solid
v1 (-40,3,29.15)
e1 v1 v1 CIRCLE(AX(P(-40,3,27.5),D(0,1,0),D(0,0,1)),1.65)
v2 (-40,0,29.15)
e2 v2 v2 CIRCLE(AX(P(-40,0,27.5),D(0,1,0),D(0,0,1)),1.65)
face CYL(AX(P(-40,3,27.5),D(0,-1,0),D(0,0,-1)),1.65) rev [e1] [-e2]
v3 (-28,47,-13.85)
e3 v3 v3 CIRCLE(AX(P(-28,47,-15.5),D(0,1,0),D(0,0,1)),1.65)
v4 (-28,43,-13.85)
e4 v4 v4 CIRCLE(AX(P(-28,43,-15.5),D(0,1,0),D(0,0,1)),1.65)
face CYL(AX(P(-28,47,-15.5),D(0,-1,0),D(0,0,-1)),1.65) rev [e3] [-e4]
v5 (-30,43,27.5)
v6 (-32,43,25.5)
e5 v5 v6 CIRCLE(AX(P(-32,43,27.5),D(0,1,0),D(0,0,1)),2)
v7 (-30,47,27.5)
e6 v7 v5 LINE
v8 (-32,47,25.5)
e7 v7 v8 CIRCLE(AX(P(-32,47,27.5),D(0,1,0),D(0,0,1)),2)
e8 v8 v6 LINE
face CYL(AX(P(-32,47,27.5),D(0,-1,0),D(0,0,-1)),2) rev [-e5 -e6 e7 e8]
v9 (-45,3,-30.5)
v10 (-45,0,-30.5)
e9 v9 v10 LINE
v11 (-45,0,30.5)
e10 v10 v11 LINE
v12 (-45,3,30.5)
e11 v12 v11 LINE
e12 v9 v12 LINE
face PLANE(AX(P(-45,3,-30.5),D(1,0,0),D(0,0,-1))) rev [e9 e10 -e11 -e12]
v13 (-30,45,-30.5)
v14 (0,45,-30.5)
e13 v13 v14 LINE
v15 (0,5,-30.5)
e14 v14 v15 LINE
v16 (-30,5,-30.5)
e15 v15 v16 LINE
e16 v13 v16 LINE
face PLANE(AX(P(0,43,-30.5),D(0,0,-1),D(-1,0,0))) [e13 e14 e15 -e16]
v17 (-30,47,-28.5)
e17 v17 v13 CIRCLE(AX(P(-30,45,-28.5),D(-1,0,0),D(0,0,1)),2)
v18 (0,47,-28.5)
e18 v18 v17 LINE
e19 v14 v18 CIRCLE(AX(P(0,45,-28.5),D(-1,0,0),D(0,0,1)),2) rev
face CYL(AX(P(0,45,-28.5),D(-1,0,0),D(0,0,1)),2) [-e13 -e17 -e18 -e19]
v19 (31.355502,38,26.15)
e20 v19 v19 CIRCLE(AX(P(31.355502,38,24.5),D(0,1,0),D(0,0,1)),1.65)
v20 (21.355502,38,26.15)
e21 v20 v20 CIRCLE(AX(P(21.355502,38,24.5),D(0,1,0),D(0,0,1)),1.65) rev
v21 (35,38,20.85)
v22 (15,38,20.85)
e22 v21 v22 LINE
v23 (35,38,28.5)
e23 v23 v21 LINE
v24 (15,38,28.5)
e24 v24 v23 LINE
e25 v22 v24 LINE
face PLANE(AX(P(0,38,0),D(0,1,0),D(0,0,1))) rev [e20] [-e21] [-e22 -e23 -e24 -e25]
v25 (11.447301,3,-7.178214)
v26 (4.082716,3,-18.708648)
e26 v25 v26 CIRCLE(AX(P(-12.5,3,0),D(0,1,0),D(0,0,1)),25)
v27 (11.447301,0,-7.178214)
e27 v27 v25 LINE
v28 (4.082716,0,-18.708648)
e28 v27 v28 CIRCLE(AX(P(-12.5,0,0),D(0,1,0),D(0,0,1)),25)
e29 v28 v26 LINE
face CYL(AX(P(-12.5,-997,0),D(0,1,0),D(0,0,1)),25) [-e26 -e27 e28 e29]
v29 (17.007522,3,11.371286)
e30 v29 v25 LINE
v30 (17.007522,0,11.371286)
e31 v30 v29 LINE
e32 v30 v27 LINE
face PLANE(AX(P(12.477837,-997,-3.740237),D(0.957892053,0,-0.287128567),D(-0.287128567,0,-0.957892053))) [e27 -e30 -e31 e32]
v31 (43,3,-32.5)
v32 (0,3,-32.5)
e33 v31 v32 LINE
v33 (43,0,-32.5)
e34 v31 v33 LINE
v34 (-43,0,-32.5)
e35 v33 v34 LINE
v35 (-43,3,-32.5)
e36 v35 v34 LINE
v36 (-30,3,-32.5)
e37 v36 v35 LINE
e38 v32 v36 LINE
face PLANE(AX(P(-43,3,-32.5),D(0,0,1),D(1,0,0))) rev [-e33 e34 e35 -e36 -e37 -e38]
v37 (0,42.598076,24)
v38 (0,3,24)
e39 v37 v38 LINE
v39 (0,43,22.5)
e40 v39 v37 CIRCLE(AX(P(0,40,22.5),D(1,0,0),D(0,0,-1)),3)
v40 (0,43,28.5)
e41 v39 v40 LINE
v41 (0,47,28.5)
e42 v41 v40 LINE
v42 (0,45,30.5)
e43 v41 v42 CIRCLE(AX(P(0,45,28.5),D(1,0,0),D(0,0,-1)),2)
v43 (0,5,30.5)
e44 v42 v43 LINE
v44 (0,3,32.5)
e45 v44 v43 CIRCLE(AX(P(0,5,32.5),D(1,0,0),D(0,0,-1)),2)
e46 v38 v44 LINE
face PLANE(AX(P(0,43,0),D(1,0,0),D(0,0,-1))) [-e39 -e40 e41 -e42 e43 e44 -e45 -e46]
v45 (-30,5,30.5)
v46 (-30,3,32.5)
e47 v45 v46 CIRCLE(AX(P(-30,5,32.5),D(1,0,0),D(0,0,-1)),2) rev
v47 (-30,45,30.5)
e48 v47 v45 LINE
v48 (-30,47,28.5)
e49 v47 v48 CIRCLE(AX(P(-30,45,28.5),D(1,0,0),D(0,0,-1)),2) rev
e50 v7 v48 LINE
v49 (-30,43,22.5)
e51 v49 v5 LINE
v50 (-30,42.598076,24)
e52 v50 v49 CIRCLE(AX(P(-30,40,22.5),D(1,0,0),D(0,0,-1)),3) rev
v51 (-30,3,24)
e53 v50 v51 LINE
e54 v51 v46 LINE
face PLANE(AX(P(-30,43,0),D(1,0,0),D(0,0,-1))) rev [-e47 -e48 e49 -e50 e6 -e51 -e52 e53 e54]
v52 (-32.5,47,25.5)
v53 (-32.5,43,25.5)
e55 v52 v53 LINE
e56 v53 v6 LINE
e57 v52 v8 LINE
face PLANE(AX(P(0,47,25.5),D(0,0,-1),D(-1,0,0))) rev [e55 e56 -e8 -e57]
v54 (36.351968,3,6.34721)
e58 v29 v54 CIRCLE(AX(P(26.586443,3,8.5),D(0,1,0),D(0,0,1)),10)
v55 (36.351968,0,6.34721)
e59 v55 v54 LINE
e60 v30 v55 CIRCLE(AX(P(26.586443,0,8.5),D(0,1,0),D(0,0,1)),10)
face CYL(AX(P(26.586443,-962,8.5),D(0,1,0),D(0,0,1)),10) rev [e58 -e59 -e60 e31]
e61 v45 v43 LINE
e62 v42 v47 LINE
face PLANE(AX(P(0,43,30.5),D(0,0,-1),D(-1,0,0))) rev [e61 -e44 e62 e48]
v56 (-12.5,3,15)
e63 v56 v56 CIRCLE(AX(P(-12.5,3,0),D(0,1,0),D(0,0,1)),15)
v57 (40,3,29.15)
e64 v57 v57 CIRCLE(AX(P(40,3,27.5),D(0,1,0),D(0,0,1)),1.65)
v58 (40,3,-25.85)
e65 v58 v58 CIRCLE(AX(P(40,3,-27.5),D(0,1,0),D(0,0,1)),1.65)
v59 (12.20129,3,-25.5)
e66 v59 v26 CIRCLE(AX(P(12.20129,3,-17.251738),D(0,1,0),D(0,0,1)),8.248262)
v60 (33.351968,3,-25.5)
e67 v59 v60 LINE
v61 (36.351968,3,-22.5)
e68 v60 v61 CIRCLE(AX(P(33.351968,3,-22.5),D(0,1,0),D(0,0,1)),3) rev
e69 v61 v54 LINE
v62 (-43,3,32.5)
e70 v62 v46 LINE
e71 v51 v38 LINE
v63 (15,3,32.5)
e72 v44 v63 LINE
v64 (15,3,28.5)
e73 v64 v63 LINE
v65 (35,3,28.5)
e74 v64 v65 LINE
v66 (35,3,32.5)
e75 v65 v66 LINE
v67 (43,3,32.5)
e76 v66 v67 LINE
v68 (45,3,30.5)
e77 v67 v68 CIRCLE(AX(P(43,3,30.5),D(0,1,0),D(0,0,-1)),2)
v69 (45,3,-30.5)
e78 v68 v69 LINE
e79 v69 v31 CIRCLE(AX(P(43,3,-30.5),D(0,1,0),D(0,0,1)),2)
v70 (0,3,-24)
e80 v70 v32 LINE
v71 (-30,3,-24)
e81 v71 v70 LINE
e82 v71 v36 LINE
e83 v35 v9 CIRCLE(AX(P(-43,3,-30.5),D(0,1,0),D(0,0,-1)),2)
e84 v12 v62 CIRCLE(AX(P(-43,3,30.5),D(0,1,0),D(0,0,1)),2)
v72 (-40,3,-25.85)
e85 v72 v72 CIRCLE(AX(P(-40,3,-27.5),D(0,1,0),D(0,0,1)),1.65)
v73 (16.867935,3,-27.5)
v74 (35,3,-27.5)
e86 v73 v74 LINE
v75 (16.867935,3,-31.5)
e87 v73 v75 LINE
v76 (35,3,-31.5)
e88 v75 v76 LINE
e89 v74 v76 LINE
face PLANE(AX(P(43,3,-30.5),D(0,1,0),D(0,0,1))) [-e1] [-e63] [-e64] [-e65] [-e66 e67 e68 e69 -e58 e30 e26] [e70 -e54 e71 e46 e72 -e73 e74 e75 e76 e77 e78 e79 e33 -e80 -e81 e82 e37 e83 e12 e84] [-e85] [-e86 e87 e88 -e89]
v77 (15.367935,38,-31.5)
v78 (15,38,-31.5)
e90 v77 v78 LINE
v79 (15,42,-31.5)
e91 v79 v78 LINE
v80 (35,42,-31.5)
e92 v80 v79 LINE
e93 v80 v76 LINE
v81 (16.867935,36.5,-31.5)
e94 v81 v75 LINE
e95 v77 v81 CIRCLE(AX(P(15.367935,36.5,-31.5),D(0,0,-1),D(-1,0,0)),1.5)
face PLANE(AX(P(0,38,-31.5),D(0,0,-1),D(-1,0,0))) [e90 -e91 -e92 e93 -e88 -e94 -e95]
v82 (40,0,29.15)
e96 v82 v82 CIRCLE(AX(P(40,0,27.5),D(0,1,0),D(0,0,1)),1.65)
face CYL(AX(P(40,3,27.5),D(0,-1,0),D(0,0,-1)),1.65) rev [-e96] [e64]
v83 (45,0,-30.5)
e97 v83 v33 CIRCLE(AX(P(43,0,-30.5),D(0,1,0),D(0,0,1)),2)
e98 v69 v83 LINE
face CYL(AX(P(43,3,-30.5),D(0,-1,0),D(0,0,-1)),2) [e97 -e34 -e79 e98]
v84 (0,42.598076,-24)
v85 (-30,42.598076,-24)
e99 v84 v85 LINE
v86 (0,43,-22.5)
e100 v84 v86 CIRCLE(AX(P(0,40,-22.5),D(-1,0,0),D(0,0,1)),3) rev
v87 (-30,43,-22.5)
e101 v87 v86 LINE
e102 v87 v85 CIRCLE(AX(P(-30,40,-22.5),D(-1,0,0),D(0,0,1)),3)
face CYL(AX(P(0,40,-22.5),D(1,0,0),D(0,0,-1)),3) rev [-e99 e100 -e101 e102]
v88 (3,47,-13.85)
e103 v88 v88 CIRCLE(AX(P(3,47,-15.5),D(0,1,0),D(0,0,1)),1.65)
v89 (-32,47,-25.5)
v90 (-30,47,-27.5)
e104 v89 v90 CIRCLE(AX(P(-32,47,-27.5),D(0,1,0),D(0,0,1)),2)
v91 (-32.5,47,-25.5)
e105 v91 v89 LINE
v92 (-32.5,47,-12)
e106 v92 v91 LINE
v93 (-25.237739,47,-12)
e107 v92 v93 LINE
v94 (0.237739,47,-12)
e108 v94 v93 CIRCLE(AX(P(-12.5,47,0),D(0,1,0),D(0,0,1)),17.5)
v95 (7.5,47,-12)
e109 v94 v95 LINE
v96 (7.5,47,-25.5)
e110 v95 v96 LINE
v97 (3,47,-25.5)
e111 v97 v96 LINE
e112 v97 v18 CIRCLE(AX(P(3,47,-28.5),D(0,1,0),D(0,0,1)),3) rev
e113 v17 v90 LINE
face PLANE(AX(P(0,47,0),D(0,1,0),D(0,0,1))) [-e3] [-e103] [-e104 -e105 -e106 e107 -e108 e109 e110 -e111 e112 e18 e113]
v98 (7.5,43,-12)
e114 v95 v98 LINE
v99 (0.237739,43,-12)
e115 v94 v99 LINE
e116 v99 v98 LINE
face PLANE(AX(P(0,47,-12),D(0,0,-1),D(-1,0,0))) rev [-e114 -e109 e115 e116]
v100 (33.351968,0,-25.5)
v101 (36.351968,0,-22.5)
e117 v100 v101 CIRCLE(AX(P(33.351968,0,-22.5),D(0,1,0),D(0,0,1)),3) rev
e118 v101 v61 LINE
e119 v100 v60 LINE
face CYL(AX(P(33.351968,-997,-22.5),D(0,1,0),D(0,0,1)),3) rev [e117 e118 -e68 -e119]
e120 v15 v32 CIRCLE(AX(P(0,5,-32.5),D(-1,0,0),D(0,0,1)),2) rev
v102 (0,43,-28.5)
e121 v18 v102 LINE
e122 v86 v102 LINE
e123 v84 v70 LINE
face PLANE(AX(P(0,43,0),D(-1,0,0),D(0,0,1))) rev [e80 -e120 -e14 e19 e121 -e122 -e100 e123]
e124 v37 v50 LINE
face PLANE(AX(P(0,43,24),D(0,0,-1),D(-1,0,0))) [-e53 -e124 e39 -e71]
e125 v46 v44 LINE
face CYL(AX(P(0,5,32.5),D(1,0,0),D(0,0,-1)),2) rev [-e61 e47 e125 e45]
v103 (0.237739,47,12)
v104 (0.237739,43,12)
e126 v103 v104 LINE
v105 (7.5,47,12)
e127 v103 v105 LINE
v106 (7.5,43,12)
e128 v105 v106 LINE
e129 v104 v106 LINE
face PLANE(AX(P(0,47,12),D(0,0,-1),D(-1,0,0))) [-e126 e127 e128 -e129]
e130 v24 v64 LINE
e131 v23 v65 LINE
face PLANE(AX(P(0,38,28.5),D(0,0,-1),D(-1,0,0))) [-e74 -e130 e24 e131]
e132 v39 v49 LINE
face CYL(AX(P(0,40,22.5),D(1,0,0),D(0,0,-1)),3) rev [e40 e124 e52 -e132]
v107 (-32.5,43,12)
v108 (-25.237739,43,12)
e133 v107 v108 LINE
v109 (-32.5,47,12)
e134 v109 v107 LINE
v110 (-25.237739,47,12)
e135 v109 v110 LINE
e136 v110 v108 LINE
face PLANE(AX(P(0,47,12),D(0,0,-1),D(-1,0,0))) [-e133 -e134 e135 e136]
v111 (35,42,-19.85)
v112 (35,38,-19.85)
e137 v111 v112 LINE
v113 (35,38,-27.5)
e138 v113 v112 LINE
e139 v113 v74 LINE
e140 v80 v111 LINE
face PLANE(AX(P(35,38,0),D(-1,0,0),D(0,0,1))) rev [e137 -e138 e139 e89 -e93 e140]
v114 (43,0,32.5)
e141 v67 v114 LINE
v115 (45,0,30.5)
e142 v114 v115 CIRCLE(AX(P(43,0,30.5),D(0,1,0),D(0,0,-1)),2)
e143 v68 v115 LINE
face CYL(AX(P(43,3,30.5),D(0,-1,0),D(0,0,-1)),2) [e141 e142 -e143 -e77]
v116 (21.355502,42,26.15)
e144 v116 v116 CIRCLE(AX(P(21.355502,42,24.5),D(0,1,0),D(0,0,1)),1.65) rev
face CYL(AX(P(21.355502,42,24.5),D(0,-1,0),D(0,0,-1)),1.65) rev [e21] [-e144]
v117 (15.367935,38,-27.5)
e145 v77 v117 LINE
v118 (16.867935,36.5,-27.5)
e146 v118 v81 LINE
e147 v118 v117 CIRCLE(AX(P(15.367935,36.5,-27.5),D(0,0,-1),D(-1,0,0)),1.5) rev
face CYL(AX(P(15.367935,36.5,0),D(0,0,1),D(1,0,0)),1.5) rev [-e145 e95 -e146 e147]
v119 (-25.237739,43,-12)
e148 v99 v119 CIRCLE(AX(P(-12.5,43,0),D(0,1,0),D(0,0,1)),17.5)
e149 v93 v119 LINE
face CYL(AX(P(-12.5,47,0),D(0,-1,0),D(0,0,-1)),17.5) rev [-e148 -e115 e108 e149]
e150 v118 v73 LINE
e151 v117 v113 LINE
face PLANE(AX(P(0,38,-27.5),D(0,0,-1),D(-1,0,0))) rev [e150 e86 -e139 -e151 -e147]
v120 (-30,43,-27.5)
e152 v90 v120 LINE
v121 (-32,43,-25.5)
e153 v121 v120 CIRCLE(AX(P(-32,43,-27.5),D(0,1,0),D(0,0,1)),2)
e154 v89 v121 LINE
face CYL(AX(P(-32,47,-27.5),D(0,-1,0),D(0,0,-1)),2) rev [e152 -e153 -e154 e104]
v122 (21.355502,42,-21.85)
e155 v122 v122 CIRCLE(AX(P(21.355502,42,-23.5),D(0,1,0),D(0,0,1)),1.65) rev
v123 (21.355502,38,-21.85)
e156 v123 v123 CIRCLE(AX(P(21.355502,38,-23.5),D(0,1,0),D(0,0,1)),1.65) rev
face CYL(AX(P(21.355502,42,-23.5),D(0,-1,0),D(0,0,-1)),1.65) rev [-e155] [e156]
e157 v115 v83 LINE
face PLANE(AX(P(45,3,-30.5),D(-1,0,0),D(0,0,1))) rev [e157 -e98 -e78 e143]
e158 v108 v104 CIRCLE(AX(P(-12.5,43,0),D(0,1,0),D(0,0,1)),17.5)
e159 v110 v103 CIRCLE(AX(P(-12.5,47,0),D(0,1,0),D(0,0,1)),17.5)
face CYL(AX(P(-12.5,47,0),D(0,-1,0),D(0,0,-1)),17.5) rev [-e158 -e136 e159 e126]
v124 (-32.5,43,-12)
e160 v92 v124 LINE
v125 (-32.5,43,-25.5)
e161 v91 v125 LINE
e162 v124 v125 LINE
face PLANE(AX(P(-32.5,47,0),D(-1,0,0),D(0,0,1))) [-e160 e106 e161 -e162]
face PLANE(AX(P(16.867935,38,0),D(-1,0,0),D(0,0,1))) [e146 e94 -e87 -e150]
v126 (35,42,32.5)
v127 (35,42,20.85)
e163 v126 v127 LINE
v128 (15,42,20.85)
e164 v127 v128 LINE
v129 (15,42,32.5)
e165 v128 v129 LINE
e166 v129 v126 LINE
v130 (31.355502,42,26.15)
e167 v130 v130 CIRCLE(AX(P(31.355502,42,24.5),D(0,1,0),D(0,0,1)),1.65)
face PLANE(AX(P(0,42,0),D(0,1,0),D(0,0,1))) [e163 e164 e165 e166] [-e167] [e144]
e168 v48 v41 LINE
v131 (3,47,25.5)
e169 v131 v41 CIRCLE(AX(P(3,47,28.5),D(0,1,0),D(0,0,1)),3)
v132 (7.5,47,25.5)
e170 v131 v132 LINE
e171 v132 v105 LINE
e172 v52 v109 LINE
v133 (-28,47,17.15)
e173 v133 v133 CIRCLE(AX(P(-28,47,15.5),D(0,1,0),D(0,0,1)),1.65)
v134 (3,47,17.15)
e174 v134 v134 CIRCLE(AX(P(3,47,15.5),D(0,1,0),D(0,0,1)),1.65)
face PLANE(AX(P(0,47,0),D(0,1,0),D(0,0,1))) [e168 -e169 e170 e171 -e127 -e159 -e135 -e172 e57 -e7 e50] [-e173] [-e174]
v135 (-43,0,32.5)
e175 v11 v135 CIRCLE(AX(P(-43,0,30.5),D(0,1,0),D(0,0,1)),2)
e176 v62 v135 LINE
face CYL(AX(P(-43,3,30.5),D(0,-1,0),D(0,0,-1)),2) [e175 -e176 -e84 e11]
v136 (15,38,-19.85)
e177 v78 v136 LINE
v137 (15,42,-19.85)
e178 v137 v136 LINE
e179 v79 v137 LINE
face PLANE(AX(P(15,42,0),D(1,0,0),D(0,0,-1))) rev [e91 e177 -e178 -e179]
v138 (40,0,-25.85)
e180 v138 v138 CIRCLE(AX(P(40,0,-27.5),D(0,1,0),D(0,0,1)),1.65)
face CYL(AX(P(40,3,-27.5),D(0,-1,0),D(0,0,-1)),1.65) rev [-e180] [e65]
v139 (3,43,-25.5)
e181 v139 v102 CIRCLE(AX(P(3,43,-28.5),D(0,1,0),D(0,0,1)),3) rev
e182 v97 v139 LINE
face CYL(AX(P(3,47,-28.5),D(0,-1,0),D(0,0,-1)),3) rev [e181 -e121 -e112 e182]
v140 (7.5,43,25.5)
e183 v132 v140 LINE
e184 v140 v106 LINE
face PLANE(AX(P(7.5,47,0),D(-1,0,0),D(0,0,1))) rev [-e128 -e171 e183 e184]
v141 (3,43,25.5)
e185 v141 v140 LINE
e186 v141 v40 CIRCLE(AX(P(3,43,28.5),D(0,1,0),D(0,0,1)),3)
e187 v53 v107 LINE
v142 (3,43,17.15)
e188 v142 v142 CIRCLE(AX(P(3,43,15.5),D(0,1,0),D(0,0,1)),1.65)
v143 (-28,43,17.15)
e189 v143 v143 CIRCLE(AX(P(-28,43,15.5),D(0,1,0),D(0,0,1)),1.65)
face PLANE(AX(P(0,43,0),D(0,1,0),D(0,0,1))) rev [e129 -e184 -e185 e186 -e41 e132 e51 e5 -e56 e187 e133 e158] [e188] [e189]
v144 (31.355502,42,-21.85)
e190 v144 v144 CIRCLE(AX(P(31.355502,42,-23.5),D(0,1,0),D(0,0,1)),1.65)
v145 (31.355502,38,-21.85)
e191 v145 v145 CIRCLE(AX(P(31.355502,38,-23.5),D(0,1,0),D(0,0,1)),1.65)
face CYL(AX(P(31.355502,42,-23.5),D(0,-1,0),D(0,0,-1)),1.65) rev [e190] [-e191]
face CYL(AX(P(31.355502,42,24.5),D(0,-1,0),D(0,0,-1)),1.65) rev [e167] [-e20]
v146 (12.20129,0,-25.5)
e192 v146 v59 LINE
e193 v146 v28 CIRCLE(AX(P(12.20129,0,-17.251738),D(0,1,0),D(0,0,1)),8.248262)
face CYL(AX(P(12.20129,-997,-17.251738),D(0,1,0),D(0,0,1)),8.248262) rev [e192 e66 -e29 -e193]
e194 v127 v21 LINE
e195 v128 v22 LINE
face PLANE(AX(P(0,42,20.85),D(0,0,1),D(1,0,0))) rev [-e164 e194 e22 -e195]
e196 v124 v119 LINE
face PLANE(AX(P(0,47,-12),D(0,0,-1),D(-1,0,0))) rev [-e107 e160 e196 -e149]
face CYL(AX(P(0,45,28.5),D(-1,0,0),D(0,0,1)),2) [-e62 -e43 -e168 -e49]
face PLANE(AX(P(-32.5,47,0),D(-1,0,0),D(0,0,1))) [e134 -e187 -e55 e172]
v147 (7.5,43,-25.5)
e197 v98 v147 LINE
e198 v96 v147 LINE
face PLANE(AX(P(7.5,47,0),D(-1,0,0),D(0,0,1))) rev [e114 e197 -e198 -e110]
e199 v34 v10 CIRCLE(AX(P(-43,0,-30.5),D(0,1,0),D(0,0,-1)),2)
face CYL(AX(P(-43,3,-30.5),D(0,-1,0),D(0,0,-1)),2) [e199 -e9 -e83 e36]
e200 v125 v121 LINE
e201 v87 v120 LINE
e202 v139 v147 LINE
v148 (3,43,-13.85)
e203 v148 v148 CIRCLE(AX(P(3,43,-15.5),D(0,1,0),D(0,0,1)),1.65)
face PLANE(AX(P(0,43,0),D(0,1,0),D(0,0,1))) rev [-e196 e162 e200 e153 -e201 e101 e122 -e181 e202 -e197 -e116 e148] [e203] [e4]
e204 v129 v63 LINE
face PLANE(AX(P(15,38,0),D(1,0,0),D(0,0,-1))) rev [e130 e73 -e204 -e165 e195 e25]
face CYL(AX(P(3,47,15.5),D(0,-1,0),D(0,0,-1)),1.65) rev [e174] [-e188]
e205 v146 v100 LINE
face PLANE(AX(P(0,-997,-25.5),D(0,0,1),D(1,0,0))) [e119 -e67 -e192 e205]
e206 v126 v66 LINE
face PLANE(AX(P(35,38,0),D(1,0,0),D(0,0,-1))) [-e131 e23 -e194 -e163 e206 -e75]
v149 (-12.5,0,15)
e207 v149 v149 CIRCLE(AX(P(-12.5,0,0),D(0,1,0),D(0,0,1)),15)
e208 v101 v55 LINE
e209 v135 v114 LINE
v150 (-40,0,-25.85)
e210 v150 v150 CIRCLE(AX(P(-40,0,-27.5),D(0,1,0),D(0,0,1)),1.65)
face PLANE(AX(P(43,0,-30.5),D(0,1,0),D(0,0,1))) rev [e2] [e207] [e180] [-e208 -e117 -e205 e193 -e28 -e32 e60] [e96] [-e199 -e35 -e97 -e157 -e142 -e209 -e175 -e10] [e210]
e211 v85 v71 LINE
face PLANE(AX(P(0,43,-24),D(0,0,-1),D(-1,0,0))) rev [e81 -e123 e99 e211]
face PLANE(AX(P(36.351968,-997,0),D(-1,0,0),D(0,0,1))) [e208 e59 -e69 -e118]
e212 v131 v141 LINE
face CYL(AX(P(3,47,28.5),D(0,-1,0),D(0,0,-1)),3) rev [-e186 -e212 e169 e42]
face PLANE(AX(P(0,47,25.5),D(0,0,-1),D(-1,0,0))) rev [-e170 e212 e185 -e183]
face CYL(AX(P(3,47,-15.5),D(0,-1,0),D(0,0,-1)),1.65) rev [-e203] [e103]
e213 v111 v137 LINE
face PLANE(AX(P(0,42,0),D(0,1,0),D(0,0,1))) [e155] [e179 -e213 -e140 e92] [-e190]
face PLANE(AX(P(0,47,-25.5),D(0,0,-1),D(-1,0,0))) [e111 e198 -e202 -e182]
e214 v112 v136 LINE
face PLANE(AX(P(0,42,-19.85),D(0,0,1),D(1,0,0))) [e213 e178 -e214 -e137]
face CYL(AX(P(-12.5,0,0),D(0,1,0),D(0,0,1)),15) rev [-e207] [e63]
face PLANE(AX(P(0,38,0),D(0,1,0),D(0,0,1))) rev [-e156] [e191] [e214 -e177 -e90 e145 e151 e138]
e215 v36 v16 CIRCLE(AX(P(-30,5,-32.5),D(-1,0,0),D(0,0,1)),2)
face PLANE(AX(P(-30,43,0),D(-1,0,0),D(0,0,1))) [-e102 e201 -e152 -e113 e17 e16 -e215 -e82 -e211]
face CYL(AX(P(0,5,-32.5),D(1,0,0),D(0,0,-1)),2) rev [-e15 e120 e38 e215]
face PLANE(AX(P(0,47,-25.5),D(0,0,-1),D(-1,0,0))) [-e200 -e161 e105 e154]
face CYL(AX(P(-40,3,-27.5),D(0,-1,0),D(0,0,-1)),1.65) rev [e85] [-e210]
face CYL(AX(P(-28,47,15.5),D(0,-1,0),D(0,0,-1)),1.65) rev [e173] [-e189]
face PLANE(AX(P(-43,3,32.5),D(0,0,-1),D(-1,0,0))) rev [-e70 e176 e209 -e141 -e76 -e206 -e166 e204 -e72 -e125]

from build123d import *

# Parameters (mm, degrees)
SKETCH_1_R                = 1.65
EXTRUDE_2_DEPTH           = 3
SKETCH_2_W                = 30
SKETCH_2_H                = 5
EXTRUDE_3_DEPTH           = 40
FILLET_1_R                = 2
EXTRUDE_START             = -30
EXTRUDE_4_DEPTH           = 30
EXTRUDE_4_2_OUTLINE_R     = 1.65
EXTRUDE_4_2_DEPTH         = 4
CUT_EXTRUDE_START         = -30
CUT_EXTRUDE_1_DEPTH       = 30
CUT_EXTRUDE_START_2       = -32.5
CUT_EXTRUDE_1_2_DEPTH     = 40
CUT_EXTRUDE_START_3       = -3
CUT_EXTRUDE_1_3_OUTLINE_R = 15
CUT_EXTRUDE_1_3_DEPTH     = 3
SKETCH_7_W                = 18.132065191
SKETCH_7_H                = 4
SKETCH_7_R                = 10
SKETCH_7_W_2              = 20
EXTRUDE_6_DEPTH           = 35
SKETCH_9_W                = 20
SKETCH_9_H                = 11.65
SKETCH_9_R                = 1.65
EXTRUDE_7_DEPTH           = 4
CUT_EXTRUDE_START_4       = -31.5
CUT_EXTRUDE_2_DEPTH       = 4
CUT_EXTRUDE_START_5       = -39
CUT_EXTRUDE_2_2_OUTLINE_R = 10
CUT_EXTRUDE_2_2_DEPTH     = 40
CUT_EXTRUDE_START_6       = -1000
CUT_EXTRUDE_3_DEPTH       = 1000
SKETCH_13_W               = 30
SKETCH_13_H               = 1.5
EXTRUDE_8_DEPTH           = 40


with BuildPart() as part:
    # 草图1 → 凸台-拉伸2 (new body)
    with BuildSketch(Plane(origin=(0, 0, 0), x_dir=(1, 0, 0), z_dir=(0, 1, 0))):
        with BuildLine():
            Line((-43, 32.5), (43, 32.5))
            ThreePointArc((43, 32.5), (44.414213562, 31.914213562), (45, 30.5))
            Line((45, 30.5), (45, -30.5))
            ThreePointArc((45, -30.5), (44.414213562, -31.914213562), (43, -32.5))
            Line((43, -32.5), (-43, -32.5))
            ThreePointArc((-43, -32.5), (-44.414213562, -31.914213562), (-45, -30.5))
            Line((-45, -30.5), (-45, 30.5))
            ThreePointArc((-45, 30.5), (-44.414213562, 31.914213562), (-43, 32.5))
        make_face()
        with Locations(Location((-40, 27.5, 0), (0, 0, 270))):
            Circle(SKETCH_1_R, mode=Mode.SUBTRACT)
        with Locations(Location((40, 27.5, 0), (0, 0, 270))):
            Circle(SKETCH_1_R, mode=Mode.SUBTRACT)
        with Locations(Location((-40, -27.5, 0), (0, 0, 270))):
            Circle(SKETCH_1_R, mode=Mode.SUBTRACT)
        with Locations(Location((40, -27.5, 0), (0, 0, 270))):
            Circle(SKETCH_1_R, mode=Mode.SUBTRACT)
    extrude(amount=EXTRUDE_2_DEPTH)

    # 草图2 → 凸台-拉伸3 (add)
    with BuildSketch(Plane(origin=(0, 3, 0), x_dir=(1, 0, 0), z_dir=(0, 1, 0))):
        with Locations((-15, 28)):
            Rectangle(SKETCH_2_W, SKETCH_2_H)
        with Locations((-15, -28)):
            Rectangle(SKETCH_2_W, SKETCH_2_H)
    extrude(amount=EXTRUDE_3_DEPTH)

    # 圆角1
    fillet_1_edges = [part.edges().sort_by_distance(p)[0] for p in [
        (-15, 3, -30.5),
    ]]
    fillet(fillet_1_edges, radius=FILLET_1_R - 0.0001)  # a hair under: the kernel refuses the full size

    # 凸台-拉伸4: read off the stored shape, not the designer's step
    # 凸台-拉伸4 outline → 凸台-拉伸4 (add)
    with BuildSketch(Plane.YZ.offset(EXTRUDE_START)):
        with BuildLine():
            ThreePointArc((5, 30.5), (3.585786438, 31.085786438), (3, 32.5))
            Line((3, 32.5), (3, 30.5))
            Line((3, 30.5), (5, 30.5))
        make_face()
    extrude(amount=EXTRUDE_4_DEPTH)

    # Extrude 4 2 outline → Extrude 4 2 (add)
    # profile 1 of 2: a face of its own
    with BuildSketch(Plane(origin=(0, 43, 0), x_dir=(1, 0, 0), z_dir=(0, 1, 0))):
        with BuildLine():
            Line((7.5, 12), (7.5, 25.5))
            Line((7.5, 25.5), (3, 25.5))
            ThreePointArc((3, 25.5), (0.878679656, 26.378679656), (0, 28.5))
            Line((0, 28.5), (0, 30.5))
            Line((0, 30.5), (-30, 30.5))
            Line((-30, 30.5), (-30, 27.5))
            ThreePointArc((-30, 27.5), (-30.585786438, 26.085786438), (-32, 25.5))
            Line((-32, 25.5), (-32.5, 25.5))
            Line((-32.5, 25.5), (-32.5, 12))
            Line((-32.5, 12), (-25.237739203, 12))
            ThreePointArc((-25.237739203, 12), (-12.5, 17.5), (0.237739203, 12))
            Line((0.237739203, 12), (7.5, 12))
        make_face()
        with Locations((-28, 15.5)):
            Circle(EXTRUDE_4_2_OUTLINE_R, mode=Mode.SUBTRACT)
        with Locations((3, 15.5)):
            Circle(EXTRUDE_4_2_OUTLINE_R, mode=Mode.SUBTRACT)
    # profile 2 of 2: a face of its own
    with BuildSketch(Plane(origin=(0, 43, 0), x_dir=(1, 0, 0), z_dir=(0, 1, 0))):
        with BuildLine():
            Line((-25.237739203, -12), (-32.5, -12))
            Line((-32.5, -12), (-32.5, -25.5))
            Line((-32.5, -25.5), (-32, -25.5))
            ThreePointArc((-32, -25.5), (-30.585786438, -26.085786438), (-30, -27.5))
            Line((-30, -27.5), (-30, -30.5))
            Line((-30, -30.5), (0, -30.5))
            Line((0, -30.5), (0, -28.5))
            ThreePointArc((0, -28.5), (0.878679656, -26.378679656), (3, -25.5))
            Line((3, -25.5), (7.5, -25.5))
            Line((7.5, -25.5), (7.5, -12))
            Line((7.5, -12), (0.237739203, -12))
            ThreePointArc((0.237739203, -12), (-12.5, -17.5), (-25.237739203, -12))
        make_face()
        with Locations((-28, -15.5)):
            Circle(EXTRUDE_4_2_OUTLINE_R, mode=Mode.SUBTRACT)
        with Locations((3, -15.5)):
            Circle(EXTRUDE_4_2_OUTLINE_R, mode=Mode.SUBTRACT)
    extrude(amount=EXTRUDE_4_2_DEPTH)

    # 切除-拉伸1: read off the stored shape, not the designer's step
    # 切除-拉伸1 outline → 切除-拉伸1 (add)
    with BuildSketch(Plane.YZ.offset(CUT_EXTRUDE_START)):
        with BuildLine():
            ThreePointArc((40, 25.5), (42.121320344, 24.621320344), (43, 22.5))
            Line((43, 22.5), (43, 25.5))
            Line((43, 25.5), (40, 25.5))
        make_face()
        with BuildLine():
            ThreePointArc((43, -22.5), (42.121320344, -24.621320344), (40, -25.5))
            Line((40, -25.5), (43, -25.5))
            Line((43, -25.5), (43, -22.5))
        make_face()
    extrude(amount=CUT_EXTRUDE_1_DEPTH)

    # Cut-Extrude 1 2 outline → Cut-Extrude 1 2 (cut)
    with BuildSketch(Plane.YZ.offset(CUT_EXTRUDE_START_2)):
        with BuildLine():
            Line((47, 30.5), (45, 30.5))
            ThreePointArc((45, 30.5), (46.414213562, 29.914213562), (47, 28.5))
            Line((47, 28.5), (47, 30.5))
        make_face()
        with BuildLine():
            Line((47, -30.5), (47, -28.5))
            ThreePointArc((47, -28.5), (46.414213562, -29.914213562), (45, -30.5))
            Line((45, -30.5), (47, -30.5))
        make_face()
    extrude(amount=CUT_EXTRUDE_1_2_DEPTH, mode=Mode.SUBTRACT)

    # Cut-Extrude 1 3 outline → Cut-Extrude 1 3 (cut)
    with BuildSketch(Plane(origin=(0, 3, 0), x_dir=(1, 0, 0), z_dir=(0, 1, 0)).offset(CUT_EXTRUDE_START_3)):
        with Locations((-12.5, 0)):
            Circle(CUT_EXTRUDE_1_3_OUTLINE_R)
    extrude(amount=CUT_EXTRUDE_1_3_DEPTH, mode=Mode.SUBTRACT)

    # 草图7 → 凸台-拉伸6 (add)
    with BuildSketch(Plane(origin=(0, 3, 0), x_dir=(1, 0, 0), z_dir=(0, 1, 0))):
        with Locations((25.933967405, 29.5)):
            Rectangle(SKETCH_7_W, SKETCH_7_H)
        with Locations(Location((26.586442662, -8.5, 0), (0, 0, 270))):
            Circle(SKETCH_7_R)
        with Locations((25, -30.5)):
            Rectangle(SKETCH_7_W_2, SKETCH_7_H)
    extrude(amount=EXTRUDE_6_DEPTH)

    # 草图9 → 凸台-拉伸7 (add)
    # profile 1 of 2: a face of its own
    with BuildSketch(Plane(origin=(0, 38, 0), x_dir=(1, 0, 0), z_dir=(0, 1, 0))):
        with Locations((25, 25.675)):
            Rectangle(SKETCH_9_W, SKETCH_9_H)
        with Locations(Location((31.355501541, 23.5, 0), (0, 0, 270))):
            Circle(SKETCH_9_R, mode=Mode.SUBTRACT)
        with Locations(Location((21.355501541, 23.5, 0), (0, 0, 270))):
            Circle(SKETCH_9_R, mode=Mode.SUBTRACT)
    # profile 2 of 2: a face of its own
    with BuildSketch(Plane(origin=(0, 38, 0), x_dir=(1, 0, 0), z_dir=(0, 1, 0))):
        with Locations((25, -26.675)):
            Rectangle(SKETCH_9_W, SKETCH_9_H)
        with Locations(Location((31.355501541, -24.5, 0), (0, 0, 270))):
            Circle(SKETCH_9_R, mode=Mode.SUBTRACT)
        with Locations(Location((21.355501541, -24.5, 0), (0, 0, 270))):
            Circle(SKETCH_9_R, mode=Mode.SUBTRACT)
    extrude(amount=EXTRUDE_7_DEPTH)

    # 切除-拉伸2: read off the stored shape, not the designer's step
    # 切除-拉伸2 outline → 切除-拉伸2 (add)
    with BuildSketch(Plane.XY.offset(CUT_EXTRUDE_START_4)):
        with BuildLine():
            ThreePointArc((15.367934809, 38), (16.42859498, 37.560660171), (16.867934809, 36.5))
            Line((16.867934809, 36.5), (16.867934809, 38))
            Line((16.867934809, 38), (15.367934809, 38))
        make_face()
    extrude(amount=CUT_EXTRUDE_2_DEPTH)

    # Cut-Extrude 2 2 outline → Cut-Extrude 2 2 (cut)
    with BuildSketch(Plane(origin=(0, 38, 0), x_dir=(1, 0, 0), z_dir=(0, 1, 0)).offset(CUT_EXTRUDE_START_5)):
        with Locations((26.586442662, -8.5)):
            Circle(CUT_EXTRUDE_2_2_OUTLINE_R)
    extrude(amount=CUT_EXTRUDE_2_2_DEPTH, mode=Mode.SUBTRACT)

    # 草图11 → 切除-拉伸3 (cut)
    with BuildSketch(Plane(origin=(0, 3, 0), x_dir=(1, 0, 0), z_dir=(0, 1, 0)).offset(CUT_EXTRUDE_START_6)):
        with BuildLine():
            Line((36.351968475, -6.347209811), (36.351968475, 22.5))
            ThreePointArc((36.351968475, 22.5), (35.473288819, 24.621320344), (33.351968475, 25.5))
            Line((33.351968475, 25.5), (12.201289858, 25.5))
            ThreePointArc((12.201289858, 25.5), (6.908991343, 23.578301134), (4.082716458, 18.708648131))
            ThreePointArc((4.082716458, 18.708648131), (8.569131741, 13.457031161), (11.447301334, 7.178214179))
            Line((11.447301334, 7.178214179), (17.007522129, -11.371285672))
            ThreePointArc((17.007522129, -11.371285672), (24.072672596, 1.178892501), (36.351968475, -6.347209811))
        make_face()
    extrude(amount=CUT_EXTRUDE_3_DEPTH, mode=Mode.SUBTRACT)

    # 草图13 → 凸台-拉伸8 (add)
    with BuildSketch(Plane(origin=(0, 3, 0), x_dir=(1, 0, 0), z_dir=(0, 1, 0))):
        with Locations((-15, 24.75)):
            Rectangle(SKETCH_13_W, SKETCH_13_H)
        with Locations((-15, -24.75)):
            Rectangle(SKETCH_13_W, SKETCH_13_H)
    extrude(amount=EXTRUDE_8_DEPTH)


solid = part.part
